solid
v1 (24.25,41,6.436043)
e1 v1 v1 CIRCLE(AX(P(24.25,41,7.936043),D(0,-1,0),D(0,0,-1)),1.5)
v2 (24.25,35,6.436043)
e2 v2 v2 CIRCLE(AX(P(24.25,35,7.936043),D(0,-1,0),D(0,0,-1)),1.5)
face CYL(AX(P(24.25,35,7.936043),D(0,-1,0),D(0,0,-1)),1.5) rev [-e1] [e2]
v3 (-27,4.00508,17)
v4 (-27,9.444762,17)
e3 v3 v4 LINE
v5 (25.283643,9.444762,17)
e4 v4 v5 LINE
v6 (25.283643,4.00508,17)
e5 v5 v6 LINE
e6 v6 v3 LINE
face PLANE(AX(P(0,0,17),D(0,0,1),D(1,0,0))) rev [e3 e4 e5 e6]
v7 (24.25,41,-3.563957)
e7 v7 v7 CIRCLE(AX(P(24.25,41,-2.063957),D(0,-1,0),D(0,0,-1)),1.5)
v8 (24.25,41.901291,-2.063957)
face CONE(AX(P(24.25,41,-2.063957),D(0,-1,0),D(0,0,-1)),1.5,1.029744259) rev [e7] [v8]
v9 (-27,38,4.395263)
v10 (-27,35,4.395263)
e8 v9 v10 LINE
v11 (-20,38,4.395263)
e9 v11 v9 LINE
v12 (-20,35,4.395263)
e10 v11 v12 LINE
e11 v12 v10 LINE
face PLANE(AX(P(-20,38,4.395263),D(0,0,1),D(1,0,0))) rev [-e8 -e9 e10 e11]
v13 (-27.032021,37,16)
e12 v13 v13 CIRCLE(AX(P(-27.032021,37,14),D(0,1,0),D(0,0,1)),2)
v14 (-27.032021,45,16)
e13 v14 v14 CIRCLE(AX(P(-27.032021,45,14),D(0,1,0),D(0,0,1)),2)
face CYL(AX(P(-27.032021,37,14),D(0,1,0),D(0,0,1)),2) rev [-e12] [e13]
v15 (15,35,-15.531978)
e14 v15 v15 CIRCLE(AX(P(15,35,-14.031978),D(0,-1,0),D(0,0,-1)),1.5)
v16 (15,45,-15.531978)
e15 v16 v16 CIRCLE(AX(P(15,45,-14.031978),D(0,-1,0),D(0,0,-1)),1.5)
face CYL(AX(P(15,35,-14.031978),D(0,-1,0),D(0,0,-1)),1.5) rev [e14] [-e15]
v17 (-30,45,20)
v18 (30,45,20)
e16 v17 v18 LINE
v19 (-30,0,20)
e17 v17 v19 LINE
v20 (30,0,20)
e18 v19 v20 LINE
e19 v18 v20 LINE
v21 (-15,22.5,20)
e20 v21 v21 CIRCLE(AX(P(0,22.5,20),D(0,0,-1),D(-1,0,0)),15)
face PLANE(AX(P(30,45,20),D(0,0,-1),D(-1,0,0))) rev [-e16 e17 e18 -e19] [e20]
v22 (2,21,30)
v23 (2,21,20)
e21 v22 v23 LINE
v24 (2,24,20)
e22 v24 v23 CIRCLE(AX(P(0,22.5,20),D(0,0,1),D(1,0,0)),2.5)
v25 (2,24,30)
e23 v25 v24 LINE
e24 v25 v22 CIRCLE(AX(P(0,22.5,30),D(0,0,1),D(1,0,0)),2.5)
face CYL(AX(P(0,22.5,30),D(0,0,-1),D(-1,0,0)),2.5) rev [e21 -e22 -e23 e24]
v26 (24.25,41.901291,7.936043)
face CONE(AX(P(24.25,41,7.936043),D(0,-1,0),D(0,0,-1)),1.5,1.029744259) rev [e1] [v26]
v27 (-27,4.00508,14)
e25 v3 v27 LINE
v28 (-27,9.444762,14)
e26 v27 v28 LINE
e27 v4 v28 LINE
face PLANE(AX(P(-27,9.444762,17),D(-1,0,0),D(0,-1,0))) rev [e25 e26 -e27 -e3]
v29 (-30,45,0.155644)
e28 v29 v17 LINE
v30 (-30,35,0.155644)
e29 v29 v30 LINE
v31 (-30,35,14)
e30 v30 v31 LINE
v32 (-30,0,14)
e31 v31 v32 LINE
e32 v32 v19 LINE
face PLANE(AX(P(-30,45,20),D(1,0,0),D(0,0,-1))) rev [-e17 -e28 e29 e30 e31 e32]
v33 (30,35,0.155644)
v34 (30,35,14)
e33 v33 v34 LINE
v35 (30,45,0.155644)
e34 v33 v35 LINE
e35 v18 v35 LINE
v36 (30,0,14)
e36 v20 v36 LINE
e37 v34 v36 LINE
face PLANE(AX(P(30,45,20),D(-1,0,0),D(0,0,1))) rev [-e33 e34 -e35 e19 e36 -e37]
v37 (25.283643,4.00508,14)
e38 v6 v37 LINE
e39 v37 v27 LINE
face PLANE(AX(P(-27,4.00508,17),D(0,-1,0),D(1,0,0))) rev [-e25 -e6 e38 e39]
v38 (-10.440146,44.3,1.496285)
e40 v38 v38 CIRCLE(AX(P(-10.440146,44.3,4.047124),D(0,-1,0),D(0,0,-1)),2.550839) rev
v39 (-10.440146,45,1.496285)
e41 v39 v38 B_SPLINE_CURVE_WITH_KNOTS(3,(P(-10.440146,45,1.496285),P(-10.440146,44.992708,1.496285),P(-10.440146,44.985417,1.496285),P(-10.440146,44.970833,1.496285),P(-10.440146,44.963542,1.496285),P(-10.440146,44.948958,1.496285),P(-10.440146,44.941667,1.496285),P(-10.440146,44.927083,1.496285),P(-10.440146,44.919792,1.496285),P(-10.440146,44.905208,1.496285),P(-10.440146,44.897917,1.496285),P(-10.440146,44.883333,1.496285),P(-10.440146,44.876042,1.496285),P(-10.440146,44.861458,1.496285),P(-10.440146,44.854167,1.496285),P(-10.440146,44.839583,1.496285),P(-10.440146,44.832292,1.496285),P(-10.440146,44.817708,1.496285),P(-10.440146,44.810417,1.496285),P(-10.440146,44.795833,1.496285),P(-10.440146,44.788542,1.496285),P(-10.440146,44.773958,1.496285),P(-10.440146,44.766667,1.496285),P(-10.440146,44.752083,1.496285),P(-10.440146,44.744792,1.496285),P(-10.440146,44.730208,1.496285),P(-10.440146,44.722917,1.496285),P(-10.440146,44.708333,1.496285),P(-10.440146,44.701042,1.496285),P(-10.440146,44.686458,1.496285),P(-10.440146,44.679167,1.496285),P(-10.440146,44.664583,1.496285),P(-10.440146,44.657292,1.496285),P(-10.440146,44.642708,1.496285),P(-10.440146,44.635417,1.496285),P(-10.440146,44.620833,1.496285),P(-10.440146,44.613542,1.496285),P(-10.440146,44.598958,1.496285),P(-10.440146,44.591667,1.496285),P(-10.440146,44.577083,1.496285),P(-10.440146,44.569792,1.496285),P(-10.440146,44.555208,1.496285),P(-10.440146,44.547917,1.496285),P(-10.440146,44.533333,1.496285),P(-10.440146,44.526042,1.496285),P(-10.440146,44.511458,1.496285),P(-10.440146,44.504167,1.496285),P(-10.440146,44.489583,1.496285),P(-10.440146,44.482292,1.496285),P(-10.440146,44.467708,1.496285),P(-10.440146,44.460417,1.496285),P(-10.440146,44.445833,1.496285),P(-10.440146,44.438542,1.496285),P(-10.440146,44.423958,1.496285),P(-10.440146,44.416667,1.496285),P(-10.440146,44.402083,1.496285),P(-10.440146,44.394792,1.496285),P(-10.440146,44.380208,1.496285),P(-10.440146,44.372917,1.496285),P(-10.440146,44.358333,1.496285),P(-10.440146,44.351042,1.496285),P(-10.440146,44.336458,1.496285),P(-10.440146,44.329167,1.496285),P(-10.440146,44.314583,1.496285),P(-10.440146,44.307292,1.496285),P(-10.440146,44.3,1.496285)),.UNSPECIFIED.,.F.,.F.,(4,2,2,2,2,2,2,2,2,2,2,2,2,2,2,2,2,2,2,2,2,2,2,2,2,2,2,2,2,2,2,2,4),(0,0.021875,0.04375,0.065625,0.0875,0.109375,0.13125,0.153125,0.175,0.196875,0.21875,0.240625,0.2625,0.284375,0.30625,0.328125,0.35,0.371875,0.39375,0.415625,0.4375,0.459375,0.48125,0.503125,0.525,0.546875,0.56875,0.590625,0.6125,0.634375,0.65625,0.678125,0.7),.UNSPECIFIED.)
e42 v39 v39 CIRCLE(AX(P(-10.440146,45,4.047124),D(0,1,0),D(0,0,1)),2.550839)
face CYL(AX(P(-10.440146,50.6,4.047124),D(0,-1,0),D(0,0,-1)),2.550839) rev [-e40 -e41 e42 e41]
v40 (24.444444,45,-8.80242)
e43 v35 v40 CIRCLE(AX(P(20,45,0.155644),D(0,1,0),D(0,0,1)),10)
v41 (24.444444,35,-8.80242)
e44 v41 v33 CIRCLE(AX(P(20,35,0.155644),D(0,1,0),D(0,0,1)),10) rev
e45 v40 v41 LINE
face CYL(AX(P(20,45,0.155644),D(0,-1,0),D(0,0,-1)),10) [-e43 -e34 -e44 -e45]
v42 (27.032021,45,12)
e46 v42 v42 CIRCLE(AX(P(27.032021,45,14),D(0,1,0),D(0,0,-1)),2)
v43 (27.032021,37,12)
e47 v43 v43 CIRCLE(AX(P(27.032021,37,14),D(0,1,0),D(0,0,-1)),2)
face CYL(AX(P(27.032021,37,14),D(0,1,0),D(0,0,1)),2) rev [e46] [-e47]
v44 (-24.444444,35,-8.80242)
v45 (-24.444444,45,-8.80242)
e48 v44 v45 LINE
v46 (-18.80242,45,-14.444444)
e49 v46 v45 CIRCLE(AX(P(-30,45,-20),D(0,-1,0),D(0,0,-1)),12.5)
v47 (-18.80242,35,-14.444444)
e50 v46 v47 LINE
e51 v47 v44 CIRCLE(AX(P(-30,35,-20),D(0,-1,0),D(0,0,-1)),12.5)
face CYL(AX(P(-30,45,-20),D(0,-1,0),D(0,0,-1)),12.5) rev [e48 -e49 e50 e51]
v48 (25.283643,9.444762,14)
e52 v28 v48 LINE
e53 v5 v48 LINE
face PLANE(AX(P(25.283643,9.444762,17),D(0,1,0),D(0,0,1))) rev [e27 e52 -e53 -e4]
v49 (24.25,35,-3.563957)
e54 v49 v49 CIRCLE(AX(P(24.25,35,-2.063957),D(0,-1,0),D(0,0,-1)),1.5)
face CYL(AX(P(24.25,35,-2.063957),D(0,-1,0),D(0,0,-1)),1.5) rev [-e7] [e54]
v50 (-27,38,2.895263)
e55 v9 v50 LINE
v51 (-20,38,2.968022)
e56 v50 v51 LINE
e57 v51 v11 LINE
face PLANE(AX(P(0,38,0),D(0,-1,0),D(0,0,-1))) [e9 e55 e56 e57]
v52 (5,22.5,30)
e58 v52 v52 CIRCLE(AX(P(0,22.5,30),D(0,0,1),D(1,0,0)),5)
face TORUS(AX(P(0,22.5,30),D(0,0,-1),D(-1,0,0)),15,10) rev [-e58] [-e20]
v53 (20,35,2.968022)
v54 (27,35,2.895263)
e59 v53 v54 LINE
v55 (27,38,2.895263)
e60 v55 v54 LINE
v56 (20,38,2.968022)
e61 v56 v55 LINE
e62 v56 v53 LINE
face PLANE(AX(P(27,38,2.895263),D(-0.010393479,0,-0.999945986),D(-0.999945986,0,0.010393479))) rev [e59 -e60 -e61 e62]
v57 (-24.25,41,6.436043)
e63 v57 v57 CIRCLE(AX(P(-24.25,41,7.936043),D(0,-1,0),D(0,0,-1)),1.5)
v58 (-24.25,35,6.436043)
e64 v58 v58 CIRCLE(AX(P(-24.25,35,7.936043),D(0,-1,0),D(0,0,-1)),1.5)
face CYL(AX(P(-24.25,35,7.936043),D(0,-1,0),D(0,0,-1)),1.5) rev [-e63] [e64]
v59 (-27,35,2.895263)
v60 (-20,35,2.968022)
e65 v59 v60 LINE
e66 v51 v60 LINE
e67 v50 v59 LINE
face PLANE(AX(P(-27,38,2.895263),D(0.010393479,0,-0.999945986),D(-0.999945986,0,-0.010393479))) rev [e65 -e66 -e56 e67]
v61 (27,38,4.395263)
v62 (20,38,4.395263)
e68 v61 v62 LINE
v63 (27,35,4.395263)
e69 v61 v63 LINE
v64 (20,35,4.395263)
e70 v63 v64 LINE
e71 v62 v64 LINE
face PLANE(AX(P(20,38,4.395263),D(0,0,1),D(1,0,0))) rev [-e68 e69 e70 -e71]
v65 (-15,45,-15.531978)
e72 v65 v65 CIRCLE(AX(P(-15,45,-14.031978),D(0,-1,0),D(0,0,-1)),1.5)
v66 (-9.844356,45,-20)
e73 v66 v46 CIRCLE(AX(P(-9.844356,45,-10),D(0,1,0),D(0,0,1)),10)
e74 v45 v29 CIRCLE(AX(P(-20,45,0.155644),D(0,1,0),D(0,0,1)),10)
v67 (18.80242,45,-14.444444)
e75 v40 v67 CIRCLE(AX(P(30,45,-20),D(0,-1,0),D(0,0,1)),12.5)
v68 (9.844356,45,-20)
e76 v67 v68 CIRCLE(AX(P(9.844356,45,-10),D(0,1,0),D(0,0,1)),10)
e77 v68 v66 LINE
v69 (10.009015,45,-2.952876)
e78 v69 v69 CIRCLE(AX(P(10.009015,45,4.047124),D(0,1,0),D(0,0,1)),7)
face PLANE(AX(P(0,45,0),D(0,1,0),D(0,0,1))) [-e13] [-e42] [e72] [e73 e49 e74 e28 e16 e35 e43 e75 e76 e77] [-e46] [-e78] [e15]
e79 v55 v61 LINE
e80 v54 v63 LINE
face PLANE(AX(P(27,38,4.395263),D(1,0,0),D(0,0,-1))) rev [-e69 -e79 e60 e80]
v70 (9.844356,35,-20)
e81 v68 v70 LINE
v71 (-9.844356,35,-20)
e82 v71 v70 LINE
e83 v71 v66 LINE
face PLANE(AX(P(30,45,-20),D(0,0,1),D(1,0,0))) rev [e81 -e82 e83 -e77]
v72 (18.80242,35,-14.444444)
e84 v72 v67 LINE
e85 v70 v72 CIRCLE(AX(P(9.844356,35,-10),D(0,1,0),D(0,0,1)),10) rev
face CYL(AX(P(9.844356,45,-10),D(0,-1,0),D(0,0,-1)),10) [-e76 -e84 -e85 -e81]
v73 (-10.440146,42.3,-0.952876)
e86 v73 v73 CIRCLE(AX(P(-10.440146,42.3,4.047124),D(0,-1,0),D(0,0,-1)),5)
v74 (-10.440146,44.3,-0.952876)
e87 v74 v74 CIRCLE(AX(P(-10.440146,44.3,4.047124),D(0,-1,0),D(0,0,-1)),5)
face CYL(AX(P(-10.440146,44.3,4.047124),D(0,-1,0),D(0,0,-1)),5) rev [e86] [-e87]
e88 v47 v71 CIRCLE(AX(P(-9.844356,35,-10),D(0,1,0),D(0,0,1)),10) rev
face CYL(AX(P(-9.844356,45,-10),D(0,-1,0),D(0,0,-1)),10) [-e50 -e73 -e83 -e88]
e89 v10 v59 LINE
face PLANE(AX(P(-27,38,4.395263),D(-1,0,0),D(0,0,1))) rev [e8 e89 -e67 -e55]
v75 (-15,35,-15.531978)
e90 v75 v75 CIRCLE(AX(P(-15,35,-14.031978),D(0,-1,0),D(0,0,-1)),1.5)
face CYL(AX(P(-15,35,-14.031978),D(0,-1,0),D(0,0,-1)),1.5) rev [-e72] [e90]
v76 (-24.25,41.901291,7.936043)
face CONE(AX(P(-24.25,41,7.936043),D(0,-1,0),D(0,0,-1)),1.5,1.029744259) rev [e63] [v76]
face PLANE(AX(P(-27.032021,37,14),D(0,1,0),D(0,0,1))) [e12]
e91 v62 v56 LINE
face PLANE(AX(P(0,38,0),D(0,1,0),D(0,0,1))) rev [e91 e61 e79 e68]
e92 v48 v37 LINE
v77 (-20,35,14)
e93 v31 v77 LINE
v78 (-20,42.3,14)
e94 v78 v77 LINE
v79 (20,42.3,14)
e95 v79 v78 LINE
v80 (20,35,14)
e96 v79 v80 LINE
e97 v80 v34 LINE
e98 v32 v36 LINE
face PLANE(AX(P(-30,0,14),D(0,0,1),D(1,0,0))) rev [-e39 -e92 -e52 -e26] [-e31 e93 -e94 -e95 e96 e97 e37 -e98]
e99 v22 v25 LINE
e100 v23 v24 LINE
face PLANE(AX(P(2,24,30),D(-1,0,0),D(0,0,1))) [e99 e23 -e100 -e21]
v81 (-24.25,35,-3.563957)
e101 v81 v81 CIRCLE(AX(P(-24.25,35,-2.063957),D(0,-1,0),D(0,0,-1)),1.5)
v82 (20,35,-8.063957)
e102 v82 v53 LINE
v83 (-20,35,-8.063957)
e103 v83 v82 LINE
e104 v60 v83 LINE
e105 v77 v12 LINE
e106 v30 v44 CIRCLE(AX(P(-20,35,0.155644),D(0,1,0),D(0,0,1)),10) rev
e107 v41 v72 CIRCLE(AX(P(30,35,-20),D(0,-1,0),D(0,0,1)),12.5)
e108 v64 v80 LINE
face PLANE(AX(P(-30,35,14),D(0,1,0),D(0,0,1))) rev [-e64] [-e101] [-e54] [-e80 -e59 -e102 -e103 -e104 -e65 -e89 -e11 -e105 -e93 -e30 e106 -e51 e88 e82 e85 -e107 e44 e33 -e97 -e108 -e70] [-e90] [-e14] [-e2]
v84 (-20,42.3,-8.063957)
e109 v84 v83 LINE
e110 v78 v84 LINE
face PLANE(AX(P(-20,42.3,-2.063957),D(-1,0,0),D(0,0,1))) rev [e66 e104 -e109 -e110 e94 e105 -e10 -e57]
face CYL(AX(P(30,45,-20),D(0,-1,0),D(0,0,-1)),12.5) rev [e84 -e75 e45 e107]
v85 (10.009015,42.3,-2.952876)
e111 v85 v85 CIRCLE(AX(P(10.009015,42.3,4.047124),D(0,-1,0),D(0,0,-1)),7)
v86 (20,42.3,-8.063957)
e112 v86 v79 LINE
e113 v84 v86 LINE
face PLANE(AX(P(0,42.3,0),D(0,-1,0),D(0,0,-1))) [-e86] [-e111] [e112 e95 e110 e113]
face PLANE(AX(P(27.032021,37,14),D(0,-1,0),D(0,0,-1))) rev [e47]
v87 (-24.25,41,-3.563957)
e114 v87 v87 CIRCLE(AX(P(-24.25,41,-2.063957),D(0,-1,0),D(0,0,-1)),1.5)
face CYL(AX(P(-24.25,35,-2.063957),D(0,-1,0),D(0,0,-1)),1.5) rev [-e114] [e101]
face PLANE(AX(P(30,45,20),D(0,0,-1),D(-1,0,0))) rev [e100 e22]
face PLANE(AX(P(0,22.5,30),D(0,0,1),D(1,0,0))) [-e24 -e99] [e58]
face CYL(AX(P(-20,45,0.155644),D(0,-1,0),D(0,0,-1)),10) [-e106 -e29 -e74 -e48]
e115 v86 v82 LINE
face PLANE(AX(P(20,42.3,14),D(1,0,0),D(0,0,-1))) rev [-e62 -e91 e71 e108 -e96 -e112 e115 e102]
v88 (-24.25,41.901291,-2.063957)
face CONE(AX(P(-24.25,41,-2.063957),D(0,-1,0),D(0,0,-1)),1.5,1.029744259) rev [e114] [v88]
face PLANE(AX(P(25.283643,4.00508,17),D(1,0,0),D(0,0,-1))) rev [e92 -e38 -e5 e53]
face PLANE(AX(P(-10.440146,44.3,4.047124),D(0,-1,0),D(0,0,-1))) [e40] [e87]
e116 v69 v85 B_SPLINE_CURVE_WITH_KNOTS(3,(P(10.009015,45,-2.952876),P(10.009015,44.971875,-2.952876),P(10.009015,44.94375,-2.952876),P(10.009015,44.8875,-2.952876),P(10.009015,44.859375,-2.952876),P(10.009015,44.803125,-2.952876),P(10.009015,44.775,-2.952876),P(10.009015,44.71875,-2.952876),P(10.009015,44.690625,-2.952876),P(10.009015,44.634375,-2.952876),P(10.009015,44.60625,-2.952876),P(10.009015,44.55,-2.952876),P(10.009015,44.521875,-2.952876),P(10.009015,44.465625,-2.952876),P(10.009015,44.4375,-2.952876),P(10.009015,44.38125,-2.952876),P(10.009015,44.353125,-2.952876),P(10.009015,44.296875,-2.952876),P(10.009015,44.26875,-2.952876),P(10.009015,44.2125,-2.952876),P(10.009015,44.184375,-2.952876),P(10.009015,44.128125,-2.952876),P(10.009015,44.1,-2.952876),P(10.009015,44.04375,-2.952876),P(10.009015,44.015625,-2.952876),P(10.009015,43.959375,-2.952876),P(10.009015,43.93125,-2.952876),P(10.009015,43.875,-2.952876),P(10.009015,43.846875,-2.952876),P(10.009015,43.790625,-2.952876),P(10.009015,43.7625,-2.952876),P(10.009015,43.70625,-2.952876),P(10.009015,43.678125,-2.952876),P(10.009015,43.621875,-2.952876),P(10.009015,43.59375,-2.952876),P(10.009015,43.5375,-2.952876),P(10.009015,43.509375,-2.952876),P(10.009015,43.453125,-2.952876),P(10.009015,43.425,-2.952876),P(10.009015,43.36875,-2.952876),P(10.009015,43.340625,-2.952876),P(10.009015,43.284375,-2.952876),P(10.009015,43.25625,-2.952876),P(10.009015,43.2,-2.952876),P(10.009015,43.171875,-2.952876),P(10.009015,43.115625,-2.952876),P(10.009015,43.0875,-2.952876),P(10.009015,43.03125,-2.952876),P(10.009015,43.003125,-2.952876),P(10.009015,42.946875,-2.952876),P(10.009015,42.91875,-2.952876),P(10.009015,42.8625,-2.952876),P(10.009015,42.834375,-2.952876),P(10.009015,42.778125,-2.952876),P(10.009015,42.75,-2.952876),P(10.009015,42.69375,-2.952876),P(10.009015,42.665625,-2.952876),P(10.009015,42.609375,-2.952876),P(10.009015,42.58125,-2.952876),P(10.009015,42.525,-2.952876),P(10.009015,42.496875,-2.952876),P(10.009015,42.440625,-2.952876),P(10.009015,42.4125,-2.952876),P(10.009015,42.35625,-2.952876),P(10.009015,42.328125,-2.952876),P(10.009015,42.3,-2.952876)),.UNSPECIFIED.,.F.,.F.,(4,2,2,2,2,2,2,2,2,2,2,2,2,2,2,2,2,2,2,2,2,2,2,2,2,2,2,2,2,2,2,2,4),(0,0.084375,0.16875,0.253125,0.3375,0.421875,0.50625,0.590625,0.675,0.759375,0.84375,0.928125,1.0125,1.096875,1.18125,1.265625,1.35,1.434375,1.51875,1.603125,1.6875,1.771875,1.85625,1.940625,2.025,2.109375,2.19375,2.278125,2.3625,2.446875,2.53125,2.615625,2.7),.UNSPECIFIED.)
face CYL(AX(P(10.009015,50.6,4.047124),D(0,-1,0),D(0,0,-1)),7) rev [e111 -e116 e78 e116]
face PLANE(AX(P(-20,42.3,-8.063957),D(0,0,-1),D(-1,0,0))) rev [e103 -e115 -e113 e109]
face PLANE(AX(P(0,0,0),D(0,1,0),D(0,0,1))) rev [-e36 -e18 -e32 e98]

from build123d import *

# Parameters (mm, degrees)
SKETCH_4_W           = 60
SKETCH_4_H           = 40
EXTRUDE_2_DEPTH      = 45
SKETCH_5_W           = 34
SKETCH_5_H           = 35
CUT_EXTRUDE_2_DEPTH  = 78.620873481
F_3_0MM_1_D          = 3
F_3_0MM_1_DEPTH      = 6
F_3_0MM_1_TIP        = 0.901290929
CUT_EXTRUDE_3_DEPTH  = 7.3
SKETCH_9_R           = 7
CUT_EXTRUDE_4_DEPTH  = 8.3
SKETCH_10_R          = 2.550838559
CUT_EXTRUDE_5_DEPTH  = 8.3
SKETCH_11_R          = 5
CUT_EXTRUDE_6_DEPTH  = 2
CUT_EXTRUDE_7_DEPTH  = 3
SKETCH_14_W          = 52.283643435
SKETCH_14_H          = 5.439682323
CUT_EXTRUDE_8_DEPTH  = 3
SKETCH_15_R          = 5
EXTRUDE_3_DEPTH      = 10
FILLET_1_R           = 10
F_3_0MM_2_D          = 3
SKETCH_18_R          = 2
CUT_EXTRUDE_9_DEPTH  = 8
CUT_EXTRUDE_10_DEPTH = 10
FILLET_2_R           = 10


with BuildPart() as part:
    # 草图4 → 凸台-拉伸2 (new body)
    with BuildSketch(Plane(origin=(0, 0, 0), x_dir=(1, 0, 0), z_dir=(0, 1, 0))):
        Rectangle(SKETCH_4_W, SKETCH_4_H)
    extrude(amount=EXTRUDE_2_DEPTH)

    # 草图5 → 切除-拉伸2 (cut, through all)
    with BuildSketch(Plane(origin=(30, 0, 0), x_dir=(0, 0, -1), z_dir=(1, 0, 0))):
        with Locations((3, 17.5)):
            Rectangle(SKETCH_5_W, SKETCH_5_H)
    extrude(amount=-CUT_EXTRUDE_2_DEPTH, mode=Mode.SUBTRACT)

    # Ø3.0mm 暗销孔1
    with Locations(Plane.XZ.offset(-35)):
        with Locations((24.25, -2.063956798), (-24.25, 7.936043202), (-24.25, -2.063956798), (24.25, 7.936043202)):
            Hole(F_3_0MM_1_D / 2, depth=F_3_0MM_1_DEPTH)
            with Locations((0, 0, -(F_3_0MM_1_DEPTH + F_3_0MM_1_TIP / 2))):  # 118° drill point
                Cone(0, F_3_0MM_1_D / 2, F_3_0MM_1_TIP, mode=Mode.SUBTRACT)

    # 草图8 → 切除-拉伸3 (cut)
    with BuildSketch(Plane.XZ.offset(-35)):
        Polygon((-20, -2.063956798), (-20, 14), (20, 14), (20, -8.063956798), (-20, -8.063956798), align=None)
    extrude(amount=-CUT_EXTRUDE_3_DEPTH, mode=Mode.SUBTRACT)

    # 草图9 → 切除-拉伸4 (cut)
    with BuildSketch(Plane.XZ.offset(-42.3)):
        with Locations(Location((10.009015473, 4.047123648, 0), (0, 0, 270))):
            Circle(SKETCH_9_R)
    extrude(amount=-CUT_EXTRUDE_4_DEPTH, mode=Mode.SUBTRACT)

    # 草图10 → 切除-拉伸5 (cut)
    with BuildSketch(Plane.XZ.offset(-42.3)):
        with Locations(Location((-10.440145967, 4.047123648, 0), (0, 0, 270))):
            Circle(SKETCH_10_R)
    extrude(amount=-CUT_EXTRUDE_5_DEPTH, mode=Mode.SUBTRACT)

    # 草图11 → 切除-拉伸6 (cut)
    with BuildSketch(Plane.XZ.offset(-42.3)):
        with Locations(Location((-10.440145967, 4.047123648, 0), (0, 0, 270))):
            Circle(SKETCH_11_R)
    extrude(amount=-CUT_EXTRUDE_6_DEPTH, mode=Mode.SUBTRACT)

    # 草图13 → 切除-拉伸7 (cut)
    with BuildSketch(Plane.XZ.offset(-35)):
        Polygon((-20, 4.395263317), (-27, 4.395263317), (-27, 2.895263317), (-20, 2.968021601), align=None)
        Polygon((20, 2.968021601), (20, 4.395263317), (27, 4.395263317), (27, 2.895263317), align=None)
    extrude(amount=-CUT_EXTRUDE_7_DEPTH, mode=Mode.SUBTRACT)

    # 草图14 → 切除-拉伸8 (cut)
    with BuildSketch(Plane(origin=(0, 0, 14), x_dir=(-1, 0, 0), z_dir=(0, 0, -1))):
        with Locations((0.858178282, 6.724921265)):
            Rectangle(SKETCH_14_W, SKETCH_14_H)
    extrude(amount=-CUT_EXTRUDE_8_DEPTH, mode=Mode.SUBTRACT)

    # 草图15 → 凸台-拉伸3 (add)
    with BuildSketch(Plane.XY.offset(20)):
        with Locations(Location((0, 22.5, 0), (0, 0, 180))):
            Circle(SKETCH_15_R)
        with BuildLine():
            Line((2, 24), (2, 21))
            ThreePointArc((2, 21), (-2.5, 22.5), (2, 24))
        make_face(mode=Mode.SUBTRACT)
    extrude(amount=EXTRUDE_3_DEPTH)

    # 圆角1
    fillet_1_edges = [part.edges().sort_by_distance(p)[0] for p in [
        (5, 22.5, 20),
    ]]
    fillet(fillet_1_edges, radius=FILLET_1_R - 0.0001)  # a hair under: the kernel refuses the full size

    # Ø3.0mm 暗销孔2 (through all)
    with Locations(Plane.XZ.offset(-35)):
        with Locations((15, -14.031978399), (-15, -14.031978399)):
            Hole(F_3_0MM_2_D / 2)

    # 草图18 → 切除-拉伸9 (cut)
    with BuildSketch(Plane(origin=(0, 45, 0), x_dir=(1, 0, 0), z_dir=(0, 1, 0))):
        with Locations(Location((-27.03202133, -14, 0), (0, 0, 270))):
            Circle(SKETCH_18_R)
        with Locations(Location((27.03202133, -14, 0), (0, 0, 90))):
            Circle(SKETCH_18_R)
    extrude(amount=-CUT_EXTRUDE_9_DEPTH, mode=Mode.SUBTRACT)

    # 草图20 → 切除-拉伸10 (cut)
    with BuildSketch(Plane.XZ.offset(-35)):
        with BuildLine():
            Line((-30, -7.5), (-30, -20))
            Line((-30, -20), (-17.5, -20))
            ThreePointArc((-17.5, -20), (-21.161165235, -11.161165235), (-30, -7.5))
        make_face()
        with BuildLine():
            Line((30, -20), (17.5, -20))
            ThreePointArc((17.5, -20), (21.161165235, -11.161165235), (30, -7.5))
            Line((30, -7.5), (30, -20))
        make_face()
    extrude(amount=-CUT_EXTRUDE_10_DEPTH, mode=Mode.SUBTRACT)

    # 圆角2
    fillet_2_edges = [part.edges().sort_by_distance(p)[0] for p in [
        (-17.5, 40, -20),
        (-30, 40, -7.5),
        (30, 40, -7.5),
        (17.5, 40, -20),
    ]]
    fillet(fillet_2_edges, radius=FILLET_2_R)


solid = part.part
